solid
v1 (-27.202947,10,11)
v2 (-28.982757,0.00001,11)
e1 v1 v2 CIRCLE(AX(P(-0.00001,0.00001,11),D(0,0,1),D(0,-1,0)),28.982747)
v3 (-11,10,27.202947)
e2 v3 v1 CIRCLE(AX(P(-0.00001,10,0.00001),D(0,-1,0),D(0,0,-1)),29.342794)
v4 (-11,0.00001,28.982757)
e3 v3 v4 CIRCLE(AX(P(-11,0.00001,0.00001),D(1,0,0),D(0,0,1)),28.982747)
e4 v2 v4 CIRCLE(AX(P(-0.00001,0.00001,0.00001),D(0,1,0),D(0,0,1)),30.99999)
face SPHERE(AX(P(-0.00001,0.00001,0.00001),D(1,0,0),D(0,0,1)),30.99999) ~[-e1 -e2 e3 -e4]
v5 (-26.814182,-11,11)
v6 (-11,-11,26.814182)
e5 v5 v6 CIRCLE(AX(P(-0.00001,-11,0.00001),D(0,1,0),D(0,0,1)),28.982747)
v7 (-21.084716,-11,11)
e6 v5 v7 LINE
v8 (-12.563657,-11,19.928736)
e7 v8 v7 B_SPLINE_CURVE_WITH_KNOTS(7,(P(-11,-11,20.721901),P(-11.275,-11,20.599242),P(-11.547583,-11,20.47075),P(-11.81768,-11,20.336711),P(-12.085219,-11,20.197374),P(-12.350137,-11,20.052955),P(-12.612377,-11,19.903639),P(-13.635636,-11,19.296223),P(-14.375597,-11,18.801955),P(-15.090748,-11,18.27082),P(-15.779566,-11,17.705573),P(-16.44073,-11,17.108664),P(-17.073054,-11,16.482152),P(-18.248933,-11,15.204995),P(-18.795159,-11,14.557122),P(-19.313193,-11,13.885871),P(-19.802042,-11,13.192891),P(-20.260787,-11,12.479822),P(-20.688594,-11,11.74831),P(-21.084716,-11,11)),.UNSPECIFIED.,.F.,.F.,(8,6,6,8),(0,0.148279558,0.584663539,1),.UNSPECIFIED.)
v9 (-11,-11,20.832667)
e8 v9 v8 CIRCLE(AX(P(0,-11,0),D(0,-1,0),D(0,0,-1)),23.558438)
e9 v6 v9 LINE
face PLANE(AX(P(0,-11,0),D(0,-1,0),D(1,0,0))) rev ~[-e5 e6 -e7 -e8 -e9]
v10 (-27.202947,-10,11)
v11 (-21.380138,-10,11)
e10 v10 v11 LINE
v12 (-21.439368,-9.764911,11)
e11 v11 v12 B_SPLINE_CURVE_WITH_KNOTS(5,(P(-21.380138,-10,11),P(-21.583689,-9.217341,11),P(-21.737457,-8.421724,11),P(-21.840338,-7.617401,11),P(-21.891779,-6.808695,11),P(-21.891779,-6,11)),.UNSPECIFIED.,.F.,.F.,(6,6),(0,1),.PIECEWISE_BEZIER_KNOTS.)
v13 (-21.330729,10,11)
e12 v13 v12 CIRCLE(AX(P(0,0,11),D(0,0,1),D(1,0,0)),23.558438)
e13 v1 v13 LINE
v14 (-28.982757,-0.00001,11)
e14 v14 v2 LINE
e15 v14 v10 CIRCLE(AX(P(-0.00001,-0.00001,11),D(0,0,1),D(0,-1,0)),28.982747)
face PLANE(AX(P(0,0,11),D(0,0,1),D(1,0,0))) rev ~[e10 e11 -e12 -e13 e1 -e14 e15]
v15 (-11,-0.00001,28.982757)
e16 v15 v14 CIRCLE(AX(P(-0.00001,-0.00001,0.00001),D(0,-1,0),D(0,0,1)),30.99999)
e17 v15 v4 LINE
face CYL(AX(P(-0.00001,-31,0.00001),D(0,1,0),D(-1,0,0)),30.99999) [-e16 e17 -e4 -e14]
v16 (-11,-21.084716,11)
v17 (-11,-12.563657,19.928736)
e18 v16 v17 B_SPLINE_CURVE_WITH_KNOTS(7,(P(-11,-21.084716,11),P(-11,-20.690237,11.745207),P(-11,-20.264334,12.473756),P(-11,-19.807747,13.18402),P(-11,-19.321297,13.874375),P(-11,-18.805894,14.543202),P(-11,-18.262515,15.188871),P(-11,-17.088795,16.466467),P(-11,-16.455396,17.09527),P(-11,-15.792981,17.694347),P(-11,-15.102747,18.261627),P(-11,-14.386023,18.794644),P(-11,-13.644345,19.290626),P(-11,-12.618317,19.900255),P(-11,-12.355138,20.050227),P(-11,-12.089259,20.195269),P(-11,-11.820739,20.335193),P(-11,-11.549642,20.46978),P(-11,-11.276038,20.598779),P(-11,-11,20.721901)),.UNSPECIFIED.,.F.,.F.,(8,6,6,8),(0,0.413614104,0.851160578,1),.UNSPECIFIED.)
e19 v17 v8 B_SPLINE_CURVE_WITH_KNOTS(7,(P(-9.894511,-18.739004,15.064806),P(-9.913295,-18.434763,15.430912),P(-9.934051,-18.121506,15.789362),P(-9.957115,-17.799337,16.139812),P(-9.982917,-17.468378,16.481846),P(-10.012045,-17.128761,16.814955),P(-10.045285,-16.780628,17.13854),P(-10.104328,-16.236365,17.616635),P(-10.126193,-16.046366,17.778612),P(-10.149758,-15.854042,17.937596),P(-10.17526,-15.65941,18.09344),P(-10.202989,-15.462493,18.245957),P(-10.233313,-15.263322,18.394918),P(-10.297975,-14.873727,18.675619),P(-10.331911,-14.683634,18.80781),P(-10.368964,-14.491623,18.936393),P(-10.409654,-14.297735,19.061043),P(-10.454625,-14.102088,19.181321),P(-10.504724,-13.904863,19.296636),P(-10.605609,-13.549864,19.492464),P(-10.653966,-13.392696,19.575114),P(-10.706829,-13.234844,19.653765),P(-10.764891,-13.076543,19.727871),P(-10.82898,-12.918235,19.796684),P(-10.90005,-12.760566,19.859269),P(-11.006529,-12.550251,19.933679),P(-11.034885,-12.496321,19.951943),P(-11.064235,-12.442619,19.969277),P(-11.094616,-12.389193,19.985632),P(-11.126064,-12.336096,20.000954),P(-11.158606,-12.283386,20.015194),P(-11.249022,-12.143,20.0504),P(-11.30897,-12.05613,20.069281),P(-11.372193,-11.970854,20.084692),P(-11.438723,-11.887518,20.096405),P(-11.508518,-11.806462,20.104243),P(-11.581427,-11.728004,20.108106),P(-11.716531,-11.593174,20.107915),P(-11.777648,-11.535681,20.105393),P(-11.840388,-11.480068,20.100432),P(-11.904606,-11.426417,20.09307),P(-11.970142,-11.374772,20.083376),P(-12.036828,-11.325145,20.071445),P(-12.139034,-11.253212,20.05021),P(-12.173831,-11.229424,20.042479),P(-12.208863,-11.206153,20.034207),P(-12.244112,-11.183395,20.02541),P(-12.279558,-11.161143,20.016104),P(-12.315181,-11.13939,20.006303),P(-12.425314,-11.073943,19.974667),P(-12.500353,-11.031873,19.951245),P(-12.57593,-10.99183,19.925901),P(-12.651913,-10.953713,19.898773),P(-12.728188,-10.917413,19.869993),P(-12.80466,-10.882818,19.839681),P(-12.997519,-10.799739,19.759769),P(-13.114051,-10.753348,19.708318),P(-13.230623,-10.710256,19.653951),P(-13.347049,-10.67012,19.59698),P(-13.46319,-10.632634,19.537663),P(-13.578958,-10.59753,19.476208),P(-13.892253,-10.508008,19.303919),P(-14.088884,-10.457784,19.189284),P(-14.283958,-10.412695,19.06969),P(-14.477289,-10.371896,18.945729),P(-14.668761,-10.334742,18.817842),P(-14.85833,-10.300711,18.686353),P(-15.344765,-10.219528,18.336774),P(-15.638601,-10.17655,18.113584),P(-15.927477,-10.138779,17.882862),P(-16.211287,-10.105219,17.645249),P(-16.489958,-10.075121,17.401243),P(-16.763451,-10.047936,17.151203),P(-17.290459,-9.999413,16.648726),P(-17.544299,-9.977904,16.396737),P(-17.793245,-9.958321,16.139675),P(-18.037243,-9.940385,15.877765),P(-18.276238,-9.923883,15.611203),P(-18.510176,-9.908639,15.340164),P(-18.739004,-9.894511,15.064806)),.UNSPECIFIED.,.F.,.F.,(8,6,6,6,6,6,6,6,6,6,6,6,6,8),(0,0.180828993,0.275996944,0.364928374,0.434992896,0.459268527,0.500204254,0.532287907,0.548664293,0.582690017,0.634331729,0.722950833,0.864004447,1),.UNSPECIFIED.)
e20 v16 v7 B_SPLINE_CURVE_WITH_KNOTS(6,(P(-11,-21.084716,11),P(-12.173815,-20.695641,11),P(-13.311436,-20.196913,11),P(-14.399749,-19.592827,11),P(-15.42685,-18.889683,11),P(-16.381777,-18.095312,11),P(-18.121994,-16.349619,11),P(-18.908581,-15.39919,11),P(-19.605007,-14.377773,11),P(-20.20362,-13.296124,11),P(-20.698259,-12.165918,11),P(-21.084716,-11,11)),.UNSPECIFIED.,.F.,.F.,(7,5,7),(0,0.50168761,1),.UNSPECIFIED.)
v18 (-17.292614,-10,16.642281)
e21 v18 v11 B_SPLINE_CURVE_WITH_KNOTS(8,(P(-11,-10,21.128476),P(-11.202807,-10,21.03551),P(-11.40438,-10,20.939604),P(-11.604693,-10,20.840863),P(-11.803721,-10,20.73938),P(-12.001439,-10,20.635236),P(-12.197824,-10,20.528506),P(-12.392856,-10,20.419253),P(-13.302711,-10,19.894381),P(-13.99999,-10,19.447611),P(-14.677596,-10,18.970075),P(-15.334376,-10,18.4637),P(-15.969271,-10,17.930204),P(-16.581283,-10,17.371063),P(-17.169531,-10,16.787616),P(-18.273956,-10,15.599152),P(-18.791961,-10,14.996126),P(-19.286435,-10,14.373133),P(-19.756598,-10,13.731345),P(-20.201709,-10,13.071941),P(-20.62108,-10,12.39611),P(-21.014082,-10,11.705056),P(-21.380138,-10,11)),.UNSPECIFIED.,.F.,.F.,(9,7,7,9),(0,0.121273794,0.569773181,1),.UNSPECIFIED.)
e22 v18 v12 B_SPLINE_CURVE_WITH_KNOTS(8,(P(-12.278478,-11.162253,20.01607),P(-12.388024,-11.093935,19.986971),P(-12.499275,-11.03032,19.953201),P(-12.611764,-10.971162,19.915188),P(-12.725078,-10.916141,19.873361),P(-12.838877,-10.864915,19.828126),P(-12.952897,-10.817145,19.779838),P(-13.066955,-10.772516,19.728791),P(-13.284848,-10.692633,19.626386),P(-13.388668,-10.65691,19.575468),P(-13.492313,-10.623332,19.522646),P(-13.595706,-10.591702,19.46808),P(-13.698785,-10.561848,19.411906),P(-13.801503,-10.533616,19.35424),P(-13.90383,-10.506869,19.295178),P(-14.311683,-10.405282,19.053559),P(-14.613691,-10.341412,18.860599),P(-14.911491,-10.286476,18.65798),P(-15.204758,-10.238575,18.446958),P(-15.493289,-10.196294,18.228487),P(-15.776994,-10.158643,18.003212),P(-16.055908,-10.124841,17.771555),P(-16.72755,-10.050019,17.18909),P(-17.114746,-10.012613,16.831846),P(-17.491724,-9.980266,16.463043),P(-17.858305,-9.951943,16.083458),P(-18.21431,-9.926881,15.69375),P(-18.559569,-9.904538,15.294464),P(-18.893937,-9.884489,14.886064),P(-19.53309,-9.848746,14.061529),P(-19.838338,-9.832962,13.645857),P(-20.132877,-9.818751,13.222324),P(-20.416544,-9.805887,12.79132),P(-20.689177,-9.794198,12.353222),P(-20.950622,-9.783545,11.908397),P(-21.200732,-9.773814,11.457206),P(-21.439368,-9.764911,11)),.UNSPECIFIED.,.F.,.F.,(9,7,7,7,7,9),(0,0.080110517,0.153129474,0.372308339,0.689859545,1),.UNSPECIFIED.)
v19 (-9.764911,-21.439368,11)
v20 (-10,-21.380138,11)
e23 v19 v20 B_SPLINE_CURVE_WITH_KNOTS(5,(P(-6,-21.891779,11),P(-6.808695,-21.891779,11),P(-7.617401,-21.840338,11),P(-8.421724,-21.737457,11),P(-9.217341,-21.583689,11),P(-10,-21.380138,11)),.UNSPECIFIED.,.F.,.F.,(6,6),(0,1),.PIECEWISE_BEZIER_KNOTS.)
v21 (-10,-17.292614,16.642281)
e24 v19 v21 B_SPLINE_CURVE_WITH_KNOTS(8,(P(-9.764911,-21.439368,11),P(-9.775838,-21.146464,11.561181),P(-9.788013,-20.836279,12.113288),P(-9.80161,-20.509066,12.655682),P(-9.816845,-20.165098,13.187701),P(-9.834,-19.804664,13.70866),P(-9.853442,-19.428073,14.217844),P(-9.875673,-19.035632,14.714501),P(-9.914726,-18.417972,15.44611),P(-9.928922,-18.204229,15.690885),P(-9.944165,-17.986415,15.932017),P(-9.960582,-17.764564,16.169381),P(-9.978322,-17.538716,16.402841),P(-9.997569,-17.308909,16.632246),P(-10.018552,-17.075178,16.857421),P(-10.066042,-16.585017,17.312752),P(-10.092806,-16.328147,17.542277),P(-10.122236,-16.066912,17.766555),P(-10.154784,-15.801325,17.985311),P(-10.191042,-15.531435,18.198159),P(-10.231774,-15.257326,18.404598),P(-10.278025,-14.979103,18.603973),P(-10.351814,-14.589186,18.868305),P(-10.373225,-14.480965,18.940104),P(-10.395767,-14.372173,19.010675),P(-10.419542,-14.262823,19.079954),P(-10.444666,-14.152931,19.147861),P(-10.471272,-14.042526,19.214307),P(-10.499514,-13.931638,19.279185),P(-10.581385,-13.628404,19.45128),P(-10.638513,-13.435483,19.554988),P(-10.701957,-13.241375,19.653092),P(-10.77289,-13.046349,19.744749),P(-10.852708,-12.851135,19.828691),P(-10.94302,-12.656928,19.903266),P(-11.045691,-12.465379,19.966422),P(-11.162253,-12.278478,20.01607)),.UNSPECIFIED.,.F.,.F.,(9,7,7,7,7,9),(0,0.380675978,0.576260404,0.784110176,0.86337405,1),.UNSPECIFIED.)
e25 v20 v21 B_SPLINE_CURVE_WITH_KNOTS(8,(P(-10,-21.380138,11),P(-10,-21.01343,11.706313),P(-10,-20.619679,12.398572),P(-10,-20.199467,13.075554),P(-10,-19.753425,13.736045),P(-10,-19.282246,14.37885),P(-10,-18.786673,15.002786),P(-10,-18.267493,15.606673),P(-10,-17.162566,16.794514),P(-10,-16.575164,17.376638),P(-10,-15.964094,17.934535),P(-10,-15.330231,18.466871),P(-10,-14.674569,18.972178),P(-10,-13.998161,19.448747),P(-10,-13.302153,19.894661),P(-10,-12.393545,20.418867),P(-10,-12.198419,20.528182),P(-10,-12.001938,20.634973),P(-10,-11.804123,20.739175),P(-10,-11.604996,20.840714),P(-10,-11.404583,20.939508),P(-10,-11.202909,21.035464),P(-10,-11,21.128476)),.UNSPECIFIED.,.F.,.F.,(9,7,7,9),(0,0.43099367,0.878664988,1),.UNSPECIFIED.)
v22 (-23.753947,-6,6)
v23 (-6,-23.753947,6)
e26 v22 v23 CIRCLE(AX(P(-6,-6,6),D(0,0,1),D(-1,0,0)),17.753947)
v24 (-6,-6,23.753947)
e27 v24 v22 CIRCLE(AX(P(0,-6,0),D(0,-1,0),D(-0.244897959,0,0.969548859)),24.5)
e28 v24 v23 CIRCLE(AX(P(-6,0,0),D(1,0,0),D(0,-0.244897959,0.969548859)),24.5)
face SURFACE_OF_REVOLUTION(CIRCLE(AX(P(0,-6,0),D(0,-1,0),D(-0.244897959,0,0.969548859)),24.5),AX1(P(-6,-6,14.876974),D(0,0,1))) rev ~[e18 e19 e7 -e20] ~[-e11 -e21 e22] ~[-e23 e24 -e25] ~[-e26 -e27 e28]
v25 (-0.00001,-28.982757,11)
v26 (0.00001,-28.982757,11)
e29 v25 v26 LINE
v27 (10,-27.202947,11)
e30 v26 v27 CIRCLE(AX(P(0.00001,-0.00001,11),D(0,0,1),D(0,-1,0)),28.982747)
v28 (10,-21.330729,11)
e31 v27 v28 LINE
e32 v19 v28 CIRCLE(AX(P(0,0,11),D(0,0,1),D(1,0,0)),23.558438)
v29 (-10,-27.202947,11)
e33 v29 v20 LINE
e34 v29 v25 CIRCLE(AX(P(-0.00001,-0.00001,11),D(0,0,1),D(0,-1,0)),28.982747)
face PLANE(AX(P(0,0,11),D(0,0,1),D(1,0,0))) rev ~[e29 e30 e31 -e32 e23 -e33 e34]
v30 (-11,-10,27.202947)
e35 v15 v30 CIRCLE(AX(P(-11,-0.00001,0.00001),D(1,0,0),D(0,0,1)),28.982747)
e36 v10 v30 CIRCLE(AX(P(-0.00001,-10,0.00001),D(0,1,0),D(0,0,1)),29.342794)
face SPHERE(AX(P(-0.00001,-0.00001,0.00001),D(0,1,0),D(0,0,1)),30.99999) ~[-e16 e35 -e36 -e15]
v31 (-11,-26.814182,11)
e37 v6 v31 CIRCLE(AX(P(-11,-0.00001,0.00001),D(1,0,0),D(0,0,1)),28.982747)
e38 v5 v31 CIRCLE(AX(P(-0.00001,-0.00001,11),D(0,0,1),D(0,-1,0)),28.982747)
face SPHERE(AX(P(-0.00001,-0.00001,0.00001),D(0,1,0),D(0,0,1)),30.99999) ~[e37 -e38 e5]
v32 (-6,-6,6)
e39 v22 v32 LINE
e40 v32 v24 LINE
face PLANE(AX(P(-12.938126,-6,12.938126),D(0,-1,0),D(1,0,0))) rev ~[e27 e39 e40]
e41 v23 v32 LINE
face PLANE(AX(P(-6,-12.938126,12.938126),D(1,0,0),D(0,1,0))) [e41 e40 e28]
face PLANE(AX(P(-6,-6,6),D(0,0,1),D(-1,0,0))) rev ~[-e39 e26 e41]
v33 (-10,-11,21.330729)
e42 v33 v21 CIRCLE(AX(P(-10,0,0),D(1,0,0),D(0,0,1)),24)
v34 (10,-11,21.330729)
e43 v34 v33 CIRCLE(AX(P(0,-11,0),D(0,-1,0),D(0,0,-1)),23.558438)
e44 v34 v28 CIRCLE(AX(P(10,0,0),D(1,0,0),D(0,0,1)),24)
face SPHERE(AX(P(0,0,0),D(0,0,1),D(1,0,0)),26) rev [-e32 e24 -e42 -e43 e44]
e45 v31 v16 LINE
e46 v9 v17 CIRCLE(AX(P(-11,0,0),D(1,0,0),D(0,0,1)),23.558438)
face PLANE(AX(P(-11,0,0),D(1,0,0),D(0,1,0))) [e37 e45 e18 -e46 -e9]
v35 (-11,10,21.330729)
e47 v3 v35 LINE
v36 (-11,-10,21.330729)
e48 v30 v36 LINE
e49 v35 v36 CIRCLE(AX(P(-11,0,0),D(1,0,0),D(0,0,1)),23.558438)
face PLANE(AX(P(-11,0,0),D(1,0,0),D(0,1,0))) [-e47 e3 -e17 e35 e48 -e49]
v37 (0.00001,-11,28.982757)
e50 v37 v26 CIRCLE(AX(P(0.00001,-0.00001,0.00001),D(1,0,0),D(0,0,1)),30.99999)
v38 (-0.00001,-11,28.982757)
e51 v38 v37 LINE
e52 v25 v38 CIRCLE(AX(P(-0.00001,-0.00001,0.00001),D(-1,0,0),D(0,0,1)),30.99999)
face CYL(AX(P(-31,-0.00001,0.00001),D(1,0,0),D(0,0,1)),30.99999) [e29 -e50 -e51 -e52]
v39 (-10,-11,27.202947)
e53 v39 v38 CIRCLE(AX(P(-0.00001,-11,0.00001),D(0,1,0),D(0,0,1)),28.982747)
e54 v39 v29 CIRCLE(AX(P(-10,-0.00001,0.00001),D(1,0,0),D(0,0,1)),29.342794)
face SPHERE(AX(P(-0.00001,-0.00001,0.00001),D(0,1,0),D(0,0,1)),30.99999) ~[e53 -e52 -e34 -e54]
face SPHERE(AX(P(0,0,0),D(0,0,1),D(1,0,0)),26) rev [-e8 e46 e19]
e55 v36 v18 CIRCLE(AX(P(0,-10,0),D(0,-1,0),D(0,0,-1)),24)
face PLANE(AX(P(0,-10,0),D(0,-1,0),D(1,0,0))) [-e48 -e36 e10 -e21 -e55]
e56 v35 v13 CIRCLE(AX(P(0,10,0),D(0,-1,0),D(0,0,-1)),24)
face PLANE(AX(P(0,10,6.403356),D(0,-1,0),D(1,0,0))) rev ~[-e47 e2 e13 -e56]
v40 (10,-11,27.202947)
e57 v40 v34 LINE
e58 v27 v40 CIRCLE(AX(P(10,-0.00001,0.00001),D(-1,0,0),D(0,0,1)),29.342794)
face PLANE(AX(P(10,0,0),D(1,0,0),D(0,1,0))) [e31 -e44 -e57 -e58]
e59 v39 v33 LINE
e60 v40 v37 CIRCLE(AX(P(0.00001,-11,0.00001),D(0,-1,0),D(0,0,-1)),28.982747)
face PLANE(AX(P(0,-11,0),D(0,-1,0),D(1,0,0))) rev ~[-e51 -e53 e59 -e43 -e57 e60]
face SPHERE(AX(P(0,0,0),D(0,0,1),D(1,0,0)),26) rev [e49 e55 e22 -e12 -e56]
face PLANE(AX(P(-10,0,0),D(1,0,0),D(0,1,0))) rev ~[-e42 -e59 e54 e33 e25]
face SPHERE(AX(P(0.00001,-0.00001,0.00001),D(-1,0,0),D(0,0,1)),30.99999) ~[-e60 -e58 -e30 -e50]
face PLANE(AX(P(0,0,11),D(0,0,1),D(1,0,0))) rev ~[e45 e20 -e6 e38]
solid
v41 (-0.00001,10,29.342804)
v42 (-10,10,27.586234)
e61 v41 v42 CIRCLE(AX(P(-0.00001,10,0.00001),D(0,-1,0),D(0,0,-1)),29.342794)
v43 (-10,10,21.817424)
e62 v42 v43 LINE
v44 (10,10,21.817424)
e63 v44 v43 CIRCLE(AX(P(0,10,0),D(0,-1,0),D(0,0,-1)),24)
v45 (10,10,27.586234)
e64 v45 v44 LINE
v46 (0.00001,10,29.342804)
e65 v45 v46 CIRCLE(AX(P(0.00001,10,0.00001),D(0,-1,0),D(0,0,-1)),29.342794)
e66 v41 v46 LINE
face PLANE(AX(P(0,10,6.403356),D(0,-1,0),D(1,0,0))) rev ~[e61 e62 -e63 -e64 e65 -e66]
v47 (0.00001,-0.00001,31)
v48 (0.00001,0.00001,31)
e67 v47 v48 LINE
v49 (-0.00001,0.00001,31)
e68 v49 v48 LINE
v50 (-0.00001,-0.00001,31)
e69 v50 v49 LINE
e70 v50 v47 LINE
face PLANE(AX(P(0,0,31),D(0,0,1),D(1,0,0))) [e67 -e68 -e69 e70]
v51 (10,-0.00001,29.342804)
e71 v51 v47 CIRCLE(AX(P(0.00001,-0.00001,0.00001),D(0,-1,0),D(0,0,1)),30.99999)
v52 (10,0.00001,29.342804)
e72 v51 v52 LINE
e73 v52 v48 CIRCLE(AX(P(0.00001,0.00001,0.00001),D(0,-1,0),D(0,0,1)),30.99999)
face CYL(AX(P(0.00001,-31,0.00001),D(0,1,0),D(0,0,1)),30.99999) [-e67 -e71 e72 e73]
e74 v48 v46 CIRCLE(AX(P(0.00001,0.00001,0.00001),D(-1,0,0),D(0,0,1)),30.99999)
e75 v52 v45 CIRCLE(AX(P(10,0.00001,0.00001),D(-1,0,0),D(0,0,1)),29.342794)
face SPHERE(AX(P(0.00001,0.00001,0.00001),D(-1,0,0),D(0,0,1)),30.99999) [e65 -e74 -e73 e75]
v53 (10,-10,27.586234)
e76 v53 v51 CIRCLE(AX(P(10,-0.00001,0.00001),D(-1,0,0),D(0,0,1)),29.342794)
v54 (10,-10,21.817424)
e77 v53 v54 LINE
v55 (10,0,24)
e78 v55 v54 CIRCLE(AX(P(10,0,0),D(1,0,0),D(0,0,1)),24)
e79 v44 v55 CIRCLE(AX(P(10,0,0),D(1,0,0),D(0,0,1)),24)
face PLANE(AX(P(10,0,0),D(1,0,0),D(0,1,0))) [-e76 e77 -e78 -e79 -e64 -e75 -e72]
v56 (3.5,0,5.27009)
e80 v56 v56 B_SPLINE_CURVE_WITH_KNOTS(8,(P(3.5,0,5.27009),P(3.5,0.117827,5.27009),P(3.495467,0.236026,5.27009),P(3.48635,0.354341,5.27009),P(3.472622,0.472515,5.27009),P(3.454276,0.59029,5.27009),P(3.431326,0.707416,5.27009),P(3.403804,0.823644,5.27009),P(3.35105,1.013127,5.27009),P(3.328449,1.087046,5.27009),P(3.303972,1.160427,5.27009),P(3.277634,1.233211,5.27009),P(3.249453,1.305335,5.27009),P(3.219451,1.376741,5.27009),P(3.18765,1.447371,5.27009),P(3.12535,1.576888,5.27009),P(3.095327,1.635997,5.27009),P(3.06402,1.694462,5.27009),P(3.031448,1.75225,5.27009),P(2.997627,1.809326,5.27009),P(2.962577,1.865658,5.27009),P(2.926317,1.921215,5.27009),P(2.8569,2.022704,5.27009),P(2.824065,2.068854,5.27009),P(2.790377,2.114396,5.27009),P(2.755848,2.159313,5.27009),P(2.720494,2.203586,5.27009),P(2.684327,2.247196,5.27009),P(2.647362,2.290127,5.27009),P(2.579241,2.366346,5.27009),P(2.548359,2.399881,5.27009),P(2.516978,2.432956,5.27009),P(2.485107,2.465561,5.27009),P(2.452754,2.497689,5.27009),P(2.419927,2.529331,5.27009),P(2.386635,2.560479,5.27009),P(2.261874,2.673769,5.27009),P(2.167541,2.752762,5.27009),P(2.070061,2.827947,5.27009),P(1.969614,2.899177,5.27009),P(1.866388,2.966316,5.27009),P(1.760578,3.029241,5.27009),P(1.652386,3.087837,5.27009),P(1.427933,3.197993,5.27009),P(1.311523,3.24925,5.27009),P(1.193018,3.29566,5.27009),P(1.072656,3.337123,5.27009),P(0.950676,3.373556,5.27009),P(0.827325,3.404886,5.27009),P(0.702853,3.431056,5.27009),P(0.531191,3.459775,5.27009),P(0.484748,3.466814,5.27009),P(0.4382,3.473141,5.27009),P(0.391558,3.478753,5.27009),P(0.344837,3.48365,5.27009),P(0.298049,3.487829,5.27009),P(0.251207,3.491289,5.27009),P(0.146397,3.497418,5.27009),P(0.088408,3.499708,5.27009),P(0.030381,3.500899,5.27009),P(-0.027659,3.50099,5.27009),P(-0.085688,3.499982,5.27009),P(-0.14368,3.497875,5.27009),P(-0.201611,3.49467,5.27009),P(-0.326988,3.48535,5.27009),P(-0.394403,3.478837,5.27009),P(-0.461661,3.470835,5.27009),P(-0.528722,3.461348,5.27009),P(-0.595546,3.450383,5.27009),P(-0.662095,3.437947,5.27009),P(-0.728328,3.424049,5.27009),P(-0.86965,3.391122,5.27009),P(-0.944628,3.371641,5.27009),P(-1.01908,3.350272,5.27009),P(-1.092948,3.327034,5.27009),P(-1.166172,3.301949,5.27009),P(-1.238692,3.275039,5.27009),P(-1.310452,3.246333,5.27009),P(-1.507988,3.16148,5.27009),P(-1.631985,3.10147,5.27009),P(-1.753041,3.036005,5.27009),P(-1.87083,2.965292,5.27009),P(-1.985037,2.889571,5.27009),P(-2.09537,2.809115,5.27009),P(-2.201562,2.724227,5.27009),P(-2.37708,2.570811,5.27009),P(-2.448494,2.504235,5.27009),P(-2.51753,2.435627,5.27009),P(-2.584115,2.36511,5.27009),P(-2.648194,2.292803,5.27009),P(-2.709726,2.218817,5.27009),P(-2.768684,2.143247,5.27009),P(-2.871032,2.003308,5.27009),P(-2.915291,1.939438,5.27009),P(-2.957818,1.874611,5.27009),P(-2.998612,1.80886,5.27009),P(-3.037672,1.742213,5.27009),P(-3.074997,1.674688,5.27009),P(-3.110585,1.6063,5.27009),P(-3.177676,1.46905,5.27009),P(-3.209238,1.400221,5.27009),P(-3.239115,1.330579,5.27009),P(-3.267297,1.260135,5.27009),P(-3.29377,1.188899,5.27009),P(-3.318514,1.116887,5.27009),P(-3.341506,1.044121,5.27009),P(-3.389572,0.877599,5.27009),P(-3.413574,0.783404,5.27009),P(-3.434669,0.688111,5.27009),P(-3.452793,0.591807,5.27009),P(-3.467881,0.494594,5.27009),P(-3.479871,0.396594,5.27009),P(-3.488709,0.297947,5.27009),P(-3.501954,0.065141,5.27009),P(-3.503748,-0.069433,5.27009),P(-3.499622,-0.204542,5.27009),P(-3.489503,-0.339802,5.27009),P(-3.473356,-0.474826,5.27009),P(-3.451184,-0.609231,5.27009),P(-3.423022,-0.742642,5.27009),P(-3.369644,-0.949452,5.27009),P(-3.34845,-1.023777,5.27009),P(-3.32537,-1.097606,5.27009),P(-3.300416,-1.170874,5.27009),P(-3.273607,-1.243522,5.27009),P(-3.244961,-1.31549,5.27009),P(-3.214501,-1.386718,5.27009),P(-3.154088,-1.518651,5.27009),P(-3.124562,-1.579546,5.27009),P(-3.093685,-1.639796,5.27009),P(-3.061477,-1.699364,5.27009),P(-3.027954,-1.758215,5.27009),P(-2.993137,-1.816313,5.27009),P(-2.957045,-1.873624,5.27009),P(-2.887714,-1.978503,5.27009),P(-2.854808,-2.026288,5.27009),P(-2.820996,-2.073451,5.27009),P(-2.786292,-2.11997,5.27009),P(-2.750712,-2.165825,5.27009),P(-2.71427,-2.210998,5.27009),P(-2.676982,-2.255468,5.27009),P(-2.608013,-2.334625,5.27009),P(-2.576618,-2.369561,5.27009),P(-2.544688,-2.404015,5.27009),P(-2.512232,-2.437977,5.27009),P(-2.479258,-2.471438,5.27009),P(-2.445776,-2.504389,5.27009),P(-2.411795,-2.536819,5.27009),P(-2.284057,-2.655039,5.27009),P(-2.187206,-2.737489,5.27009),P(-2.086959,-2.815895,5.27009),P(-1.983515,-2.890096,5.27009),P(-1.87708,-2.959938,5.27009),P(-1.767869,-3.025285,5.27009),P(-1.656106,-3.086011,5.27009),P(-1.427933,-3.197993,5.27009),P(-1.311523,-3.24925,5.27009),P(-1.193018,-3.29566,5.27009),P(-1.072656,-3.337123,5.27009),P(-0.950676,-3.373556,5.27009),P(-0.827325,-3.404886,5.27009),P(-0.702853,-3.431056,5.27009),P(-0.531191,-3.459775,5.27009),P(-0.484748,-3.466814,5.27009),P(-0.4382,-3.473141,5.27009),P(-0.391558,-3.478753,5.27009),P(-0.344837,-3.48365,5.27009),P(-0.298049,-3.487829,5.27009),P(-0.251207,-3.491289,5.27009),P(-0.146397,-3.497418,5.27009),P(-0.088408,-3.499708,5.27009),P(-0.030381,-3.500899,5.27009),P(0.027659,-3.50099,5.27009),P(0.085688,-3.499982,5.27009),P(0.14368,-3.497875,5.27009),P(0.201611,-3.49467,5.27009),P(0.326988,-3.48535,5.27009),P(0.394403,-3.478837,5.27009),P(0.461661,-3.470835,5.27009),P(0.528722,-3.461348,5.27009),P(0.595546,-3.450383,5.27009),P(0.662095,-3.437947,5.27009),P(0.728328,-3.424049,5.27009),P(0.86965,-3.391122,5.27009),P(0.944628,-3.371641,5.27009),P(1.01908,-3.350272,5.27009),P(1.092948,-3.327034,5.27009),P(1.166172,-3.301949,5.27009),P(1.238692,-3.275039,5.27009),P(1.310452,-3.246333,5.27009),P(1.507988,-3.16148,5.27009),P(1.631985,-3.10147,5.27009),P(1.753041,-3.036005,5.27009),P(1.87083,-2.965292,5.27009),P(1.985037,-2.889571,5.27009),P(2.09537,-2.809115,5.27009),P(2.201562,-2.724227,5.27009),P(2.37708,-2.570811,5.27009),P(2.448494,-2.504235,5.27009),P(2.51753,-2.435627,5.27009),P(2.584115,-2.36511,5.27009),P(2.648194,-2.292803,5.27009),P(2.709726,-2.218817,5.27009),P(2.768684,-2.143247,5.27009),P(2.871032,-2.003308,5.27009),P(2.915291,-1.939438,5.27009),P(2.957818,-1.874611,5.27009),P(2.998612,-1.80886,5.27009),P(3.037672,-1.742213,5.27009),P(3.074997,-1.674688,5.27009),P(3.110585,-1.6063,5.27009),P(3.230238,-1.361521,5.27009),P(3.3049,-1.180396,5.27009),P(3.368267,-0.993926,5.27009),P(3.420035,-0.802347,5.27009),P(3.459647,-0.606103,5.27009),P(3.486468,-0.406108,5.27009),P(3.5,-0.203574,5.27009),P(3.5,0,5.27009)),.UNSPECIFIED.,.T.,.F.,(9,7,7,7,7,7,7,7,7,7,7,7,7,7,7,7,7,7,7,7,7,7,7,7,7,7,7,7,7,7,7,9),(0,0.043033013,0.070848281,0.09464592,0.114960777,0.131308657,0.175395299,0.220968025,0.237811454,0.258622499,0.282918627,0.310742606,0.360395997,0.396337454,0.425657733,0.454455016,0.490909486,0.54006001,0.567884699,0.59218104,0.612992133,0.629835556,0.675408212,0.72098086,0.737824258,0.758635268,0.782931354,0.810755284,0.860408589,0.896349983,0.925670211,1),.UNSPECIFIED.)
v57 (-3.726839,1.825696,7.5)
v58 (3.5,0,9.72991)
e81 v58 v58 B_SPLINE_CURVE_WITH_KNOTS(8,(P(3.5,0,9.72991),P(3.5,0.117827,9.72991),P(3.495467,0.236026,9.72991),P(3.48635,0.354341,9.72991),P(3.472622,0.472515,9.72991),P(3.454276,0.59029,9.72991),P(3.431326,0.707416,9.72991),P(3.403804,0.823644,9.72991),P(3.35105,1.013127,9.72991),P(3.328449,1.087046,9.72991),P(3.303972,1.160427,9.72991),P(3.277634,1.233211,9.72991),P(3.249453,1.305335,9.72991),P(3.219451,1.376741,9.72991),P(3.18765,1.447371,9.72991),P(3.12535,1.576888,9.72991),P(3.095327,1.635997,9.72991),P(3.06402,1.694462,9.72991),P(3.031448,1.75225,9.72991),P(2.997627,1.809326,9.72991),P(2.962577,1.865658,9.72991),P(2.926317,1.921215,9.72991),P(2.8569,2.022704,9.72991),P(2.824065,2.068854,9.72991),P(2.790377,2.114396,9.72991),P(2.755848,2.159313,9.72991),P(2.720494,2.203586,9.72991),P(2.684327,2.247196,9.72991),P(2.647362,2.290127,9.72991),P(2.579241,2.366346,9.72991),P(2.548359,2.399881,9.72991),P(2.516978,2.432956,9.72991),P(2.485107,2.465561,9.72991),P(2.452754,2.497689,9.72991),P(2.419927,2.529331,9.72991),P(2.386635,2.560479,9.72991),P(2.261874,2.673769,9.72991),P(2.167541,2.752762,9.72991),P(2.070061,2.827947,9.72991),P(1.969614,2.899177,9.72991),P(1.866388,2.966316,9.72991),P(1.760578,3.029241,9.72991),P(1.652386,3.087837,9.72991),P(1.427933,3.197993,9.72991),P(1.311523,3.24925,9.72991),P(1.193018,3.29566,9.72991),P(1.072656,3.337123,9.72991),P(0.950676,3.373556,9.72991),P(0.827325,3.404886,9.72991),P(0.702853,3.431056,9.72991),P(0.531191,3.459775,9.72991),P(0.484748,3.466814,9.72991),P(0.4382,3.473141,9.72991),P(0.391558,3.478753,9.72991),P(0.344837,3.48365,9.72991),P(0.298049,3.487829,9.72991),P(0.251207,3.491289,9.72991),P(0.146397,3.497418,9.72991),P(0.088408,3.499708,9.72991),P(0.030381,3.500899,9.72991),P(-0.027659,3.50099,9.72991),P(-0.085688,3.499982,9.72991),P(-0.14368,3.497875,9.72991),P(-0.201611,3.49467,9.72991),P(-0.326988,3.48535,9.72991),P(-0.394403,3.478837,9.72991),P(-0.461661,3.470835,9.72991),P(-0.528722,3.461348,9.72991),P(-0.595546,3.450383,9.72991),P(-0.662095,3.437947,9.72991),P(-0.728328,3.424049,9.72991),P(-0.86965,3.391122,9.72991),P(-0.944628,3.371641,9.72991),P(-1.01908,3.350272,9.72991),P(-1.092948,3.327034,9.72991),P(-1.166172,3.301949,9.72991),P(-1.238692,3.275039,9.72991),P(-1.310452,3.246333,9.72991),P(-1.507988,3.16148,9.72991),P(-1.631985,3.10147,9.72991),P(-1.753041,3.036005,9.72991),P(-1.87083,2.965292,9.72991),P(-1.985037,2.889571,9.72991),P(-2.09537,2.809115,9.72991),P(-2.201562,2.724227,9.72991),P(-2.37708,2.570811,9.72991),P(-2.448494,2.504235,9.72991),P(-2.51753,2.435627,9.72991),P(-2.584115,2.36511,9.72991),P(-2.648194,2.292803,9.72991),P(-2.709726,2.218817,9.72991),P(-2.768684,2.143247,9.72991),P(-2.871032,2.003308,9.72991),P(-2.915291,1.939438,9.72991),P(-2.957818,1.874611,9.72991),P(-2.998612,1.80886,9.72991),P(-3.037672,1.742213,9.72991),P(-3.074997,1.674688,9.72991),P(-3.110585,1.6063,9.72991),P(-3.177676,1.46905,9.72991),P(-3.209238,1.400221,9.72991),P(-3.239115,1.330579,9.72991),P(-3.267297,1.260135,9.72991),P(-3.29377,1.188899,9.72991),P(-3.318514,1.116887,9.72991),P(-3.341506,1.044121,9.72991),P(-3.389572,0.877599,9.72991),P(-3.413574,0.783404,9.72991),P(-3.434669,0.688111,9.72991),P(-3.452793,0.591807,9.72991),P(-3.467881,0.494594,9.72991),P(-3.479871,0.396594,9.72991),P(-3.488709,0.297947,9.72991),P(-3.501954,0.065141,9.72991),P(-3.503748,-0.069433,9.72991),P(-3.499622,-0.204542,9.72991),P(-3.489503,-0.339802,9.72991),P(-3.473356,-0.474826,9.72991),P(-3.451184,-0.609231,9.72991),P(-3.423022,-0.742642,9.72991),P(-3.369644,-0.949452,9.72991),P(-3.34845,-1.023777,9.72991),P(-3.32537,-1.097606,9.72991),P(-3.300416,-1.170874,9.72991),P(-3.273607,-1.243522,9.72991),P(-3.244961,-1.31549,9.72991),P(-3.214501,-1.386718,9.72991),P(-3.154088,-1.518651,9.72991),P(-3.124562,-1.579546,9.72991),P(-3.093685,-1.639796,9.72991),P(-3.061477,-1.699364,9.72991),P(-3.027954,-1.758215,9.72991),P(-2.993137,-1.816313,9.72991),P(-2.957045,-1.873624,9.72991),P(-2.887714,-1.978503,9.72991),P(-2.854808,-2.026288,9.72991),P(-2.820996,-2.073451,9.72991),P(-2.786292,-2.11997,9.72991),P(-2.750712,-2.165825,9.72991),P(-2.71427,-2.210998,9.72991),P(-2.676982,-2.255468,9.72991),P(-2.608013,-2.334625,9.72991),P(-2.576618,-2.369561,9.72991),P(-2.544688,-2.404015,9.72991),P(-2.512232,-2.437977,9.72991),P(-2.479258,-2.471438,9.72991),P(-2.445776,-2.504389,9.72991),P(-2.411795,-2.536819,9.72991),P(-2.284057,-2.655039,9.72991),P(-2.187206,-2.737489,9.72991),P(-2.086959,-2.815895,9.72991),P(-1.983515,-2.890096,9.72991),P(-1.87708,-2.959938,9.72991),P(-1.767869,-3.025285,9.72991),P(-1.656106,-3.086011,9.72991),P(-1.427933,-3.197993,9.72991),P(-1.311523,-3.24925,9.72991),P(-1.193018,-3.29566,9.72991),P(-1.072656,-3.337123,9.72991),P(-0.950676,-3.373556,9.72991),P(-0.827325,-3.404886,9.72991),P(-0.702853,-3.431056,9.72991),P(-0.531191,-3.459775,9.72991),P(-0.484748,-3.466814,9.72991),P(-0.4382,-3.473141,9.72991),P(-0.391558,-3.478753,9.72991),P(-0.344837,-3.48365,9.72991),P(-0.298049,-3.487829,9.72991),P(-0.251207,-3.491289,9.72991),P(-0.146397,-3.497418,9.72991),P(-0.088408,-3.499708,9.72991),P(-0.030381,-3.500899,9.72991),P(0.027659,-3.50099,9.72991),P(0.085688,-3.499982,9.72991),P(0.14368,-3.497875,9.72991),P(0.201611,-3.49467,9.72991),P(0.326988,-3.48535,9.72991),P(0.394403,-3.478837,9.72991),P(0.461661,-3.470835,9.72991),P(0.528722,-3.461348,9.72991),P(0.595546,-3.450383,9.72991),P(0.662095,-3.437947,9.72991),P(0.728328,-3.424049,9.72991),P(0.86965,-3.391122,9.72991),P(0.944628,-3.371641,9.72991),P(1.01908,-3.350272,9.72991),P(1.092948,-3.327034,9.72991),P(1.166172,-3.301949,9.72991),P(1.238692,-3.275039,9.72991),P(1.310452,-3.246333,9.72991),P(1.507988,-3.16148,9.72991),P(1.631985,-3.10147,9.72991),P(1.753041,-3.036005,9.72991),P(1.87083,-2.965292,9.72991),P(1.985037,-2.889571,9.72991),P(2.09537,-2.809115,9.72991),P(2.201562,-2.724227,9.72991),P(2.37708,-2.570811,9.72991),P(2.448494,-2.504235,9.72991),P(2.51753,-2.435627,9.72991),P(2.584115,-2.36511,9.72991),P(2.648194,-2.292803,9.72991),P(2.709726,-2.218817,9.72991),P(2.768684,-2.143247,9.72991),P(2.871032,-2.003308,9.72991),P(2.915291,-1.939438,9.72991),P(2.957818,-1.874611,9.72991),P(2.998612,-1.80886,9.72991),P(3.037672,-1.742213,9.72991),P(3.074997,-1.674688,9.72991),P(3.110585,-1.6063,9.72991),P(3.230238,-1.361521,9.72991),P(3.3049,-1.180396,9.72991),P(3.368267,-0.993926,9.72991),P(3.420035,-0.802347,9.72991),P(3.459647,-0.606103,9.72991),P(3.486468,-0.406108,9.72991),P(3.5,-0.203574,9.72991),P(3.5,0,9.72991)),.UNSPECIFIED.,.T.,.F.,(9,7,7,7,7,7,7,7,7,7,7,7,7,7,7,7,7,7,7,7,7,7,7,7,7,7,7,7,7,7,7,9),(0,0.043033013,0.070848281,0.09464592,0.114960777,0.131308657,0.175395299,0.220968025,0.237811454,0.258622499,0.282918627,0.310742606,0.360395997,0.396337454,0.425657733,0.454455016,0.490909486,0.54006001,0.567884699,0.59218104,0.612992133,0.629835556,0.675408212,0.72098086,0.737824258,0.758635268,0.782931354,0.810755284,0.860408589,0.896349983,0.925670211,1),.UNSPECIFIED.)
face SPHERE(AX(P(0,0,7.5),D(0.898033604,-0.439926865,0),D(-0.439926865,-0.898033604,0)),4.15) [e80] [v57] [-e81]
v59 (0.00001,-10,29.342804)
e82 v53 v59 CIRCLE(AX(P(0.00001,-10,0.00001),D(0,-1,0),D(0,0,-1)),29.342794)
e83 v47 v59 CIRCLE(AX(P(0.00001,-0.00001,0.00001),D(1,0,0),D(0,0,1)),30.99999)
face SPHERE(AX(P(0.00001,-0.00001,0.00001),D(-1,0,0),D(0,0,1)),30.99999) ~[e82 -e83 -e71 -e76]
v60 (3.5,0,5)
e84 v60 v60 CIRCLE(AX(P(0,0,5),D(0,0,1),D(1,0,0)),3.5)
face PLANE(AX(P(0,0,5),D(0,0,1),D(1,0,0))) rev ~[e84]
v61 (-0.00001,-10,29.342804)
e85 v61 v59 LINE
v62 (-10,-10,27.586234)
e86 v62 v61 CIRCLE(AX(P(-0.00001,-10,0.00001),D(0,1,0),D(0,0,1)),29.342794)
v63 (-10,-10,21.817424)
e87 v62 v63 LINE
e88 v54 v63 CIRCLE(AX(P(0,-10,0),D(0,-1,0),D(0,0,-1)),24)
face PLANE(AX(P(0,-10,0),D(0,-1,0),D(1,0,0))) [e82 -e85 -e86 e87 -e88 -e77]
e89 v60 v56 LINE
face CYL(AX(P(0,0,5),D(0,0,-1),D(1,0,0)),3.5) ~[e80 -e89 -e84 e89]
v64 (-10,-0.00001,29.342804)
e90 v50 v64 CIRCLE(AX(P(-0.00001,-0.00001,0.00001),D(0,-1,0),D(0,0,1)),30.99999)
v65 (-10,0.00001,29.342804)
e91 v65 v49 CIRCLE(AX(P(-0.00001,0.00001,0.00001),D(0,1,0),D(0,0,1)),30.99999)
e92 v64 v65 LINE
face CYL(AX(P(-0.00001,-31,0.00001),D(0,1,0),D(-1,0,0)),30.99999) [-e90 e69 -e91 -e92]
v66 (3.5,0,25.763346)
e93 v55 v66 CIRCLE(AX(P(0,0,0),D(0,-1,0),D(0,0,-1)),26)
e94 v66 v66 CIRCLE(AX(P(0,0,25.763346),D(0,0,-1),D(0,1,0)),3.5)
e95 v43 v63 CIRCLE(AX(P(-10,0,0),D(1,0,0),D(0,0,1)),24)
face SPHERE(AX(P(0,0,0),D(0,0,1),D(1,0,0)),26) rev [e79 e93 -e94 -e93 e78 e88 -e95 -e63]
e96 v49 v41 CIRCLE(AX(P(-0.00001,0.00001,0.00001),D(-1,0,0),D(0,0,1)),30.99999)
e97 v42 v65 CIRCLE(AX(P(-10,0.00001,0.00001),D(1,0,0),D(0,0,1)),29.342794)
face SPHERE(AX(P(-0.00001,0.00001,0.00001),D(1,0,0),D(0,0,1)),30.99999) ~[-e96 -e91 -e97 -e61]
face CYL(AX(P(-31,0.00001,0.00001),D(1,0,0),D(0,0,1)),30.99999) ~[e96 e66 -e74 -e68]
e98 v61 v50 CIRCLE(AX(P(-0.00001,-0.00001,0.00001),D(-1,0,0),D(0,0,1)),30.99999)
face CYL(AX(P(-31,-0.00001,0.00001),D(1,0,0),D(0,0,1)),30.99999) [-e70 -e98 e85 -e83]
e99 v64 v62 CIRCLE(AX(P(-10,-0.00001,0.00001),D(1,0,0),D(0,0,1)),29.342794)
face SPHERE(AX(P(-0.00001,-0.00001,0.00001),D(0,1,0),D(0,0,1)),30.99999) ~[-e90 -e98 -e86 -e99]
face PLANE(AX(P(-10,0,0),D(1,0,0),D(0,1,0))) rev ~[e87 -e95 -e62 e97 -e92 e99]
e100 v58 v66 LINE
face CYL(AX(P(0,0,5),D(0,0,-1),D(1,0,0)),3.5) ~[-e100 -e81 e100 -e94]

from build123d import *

# Parameters (mm, degrees)
F0_W          = 62
F0_H          = 62
F1_DEPTH      = 31
F2_R          = 30.99999
F3_DEPTH      = 31
F3_DEPTH_BACK = 11
F7_W          = 63
F7_H          = 63
F8_DEPTH      = 18.9837565917
F10_W         = 63
F10_H         = 63
F11_DEPTH     = 1
F13_W         = 63
F13_H         = 63
F14_DEPTH     = 1
F16_W         = 63
F16_H         = 63
F17_DEPTH     = 25
F20_R         = 3.5
F22_DEPTH     = 22
F24_DEPTH     = 25
F28_ANGLE     = 90
F29_ANGLE     = 90


# Not quite as in the source:
# - a fillet or chamfer is up to 0.001 mm smaller than in the source, because OpenCascade refuses the exact size


with BuildPart() as f1:
    # F0 (on Top) → F1 (new body, symmetric)
    with BuildSketch(Plane.XY):
        Rectangle(F0_W, F0_H)
    extrude(amount=F1_DEPTH, both=True)

    # F2 (radius 31 in the source; OpenCascade refuses exactly that, so slightly less here)
    f2_edges = [f1.edges().sort_by_distance(p)[0] for p in [
        (0, 31, 31),
        (-31, 0, 31),
        (0, -31, 31),
        (31, 0, 31),
        (0, 31, -31),
        (-31, 0, -31),
        (0, -31, -31),
        (31, 0, -31),
        (-31, 31, 0),
        (-31, -31, 0),
        (31, -31, 0),
        (31, 31, 0),
    ]]
    fillet(f2_edges, radius=F2_R)

    # F0 (on Top) → F3 (cut, two sides)
    with BuildSketch(Plane.XY) as f3_sk:
        Rectangle(F0_W, F0_H)
    extrude(amount=-F3_DEPTH, mode=Mode.SUBTRACT)
    extrude(f3_sk.sketch, amount=F3_DEPTH_BACK, mode=Mode.SUBTRACT)

    # F4 (on Front) → F5 (revolve, cut)
    with BuildSketch(Plane.XZ):
        with BuildLine():
            Line((0, 26), (0, -26))
            ThreePointArc((0, -26), (26, 0), (0, 26))
        make_face()
    revolve(axis=Axis((0, 0, 0), (0, 0, -1)), mode=Mode.SUBTRACT)

    # F7 (on offset) → F8 (cut, through all)
    with BuildSketch(Plane.YZ.offset(10)):
        Rectangle(F7_W, F7_H)
    extrude(amount=F8_DEPTH, mode=Mode.SUBTRACT)

    # F10 (on offset) → F11 (cut)
    with BuildSketch(Plane.YZ.offset(-10)):
        Rectangle(F10_W, F10_H)
    extrude(amount=-F11_DEPTH, mode=Mode.SUBTRACT)

    # F13 (on offset) → F14 (cut)
    with BuildSketch(Plane.XZ.offset(10)):
        Rectangle(F13_W, F13_H)
    extrude(amount=F14_DEPTH, mode=Mode.SUBTRACT)

    # F16 (on offset) → F17 (cut)
    with BuildSketch(Plane.XZ.offset(-10)):
        with Locations((0, 6.4033556429)):
            Rectangle(F16_W, F16_H)
    extrude(amount=-F17_DEPTH, mode=Mode.SUBTRACT)

    # F20 (on offset) → F22 (join)
    with BuildSketch(Plane.XY.offset(5)):
        Circle(F20_R)
    extrude(amount=F22_DEPTH)

    # F21 (on offset) → F23 (revolve)
    with BuildSketch(Plane.XY.offset(7.5)):
        with BuildLine():
            Line((3.7268394552, -1.8256964905), (-3.7268394552, 1.8256964905))
            ThreePointArc((-3.7268394552, 1.8256964905), (-1.8256964905, -3.7268394552), (3.7268394552, -1.8256964905))
        make_face()
    revolve(axis=Axis((0, 0, 7.5), (0.8980336037, -0.4399268652, 0)))

    # F20 (on offset) → F24 (cut)
    with BuildSketch(Plane.XY.offset(5)):
        Circle(F20_R)
    extrude(amount=-F24_DEPTH, mode=Mode.SUBTRACT)



with BuildPart() as f28:
    # F26 (on offset) → F28 (revolve)
    with BuildSketch(Plane.XZ.offset(6)):
        with BuildLine():
            Line((-11, 11), (-11, 21.3307290077))
            ThreePointArc((-11, 21.3307290077), (-16.9705627485, 16.9705627485), (-21.3307290077, 11))
            Line((-21.3307290077, 11), (-11, 11))
        make_face()
    revolve(axis=Axis((-11, -6, 0), (0, 0, 1)), revolution_arc=F28_ANGLE)


with BuildPart() as f1_1:
    add(f1.part)

    add(f28.part)  # F29 merges F28
    # F27 (on offset) → F29 (revolve)
    with BuildSketch(Plane.XZ.offset(6)):
        with BuildLine():
            Line((-6, 6), (-6, 23.7539470404))
            ThreePointArc((-6, 23.7539470404), (-17.3241161391, 17.3241161391), (-23.7539470404, 6))
            Line((-23.7539470404, 6), (-6, 6))
        make_face()
    revolve(axis=Axis((-6, -6, 14.8769735202), (0, 0, 1)), revolution_arc=F29_ANGLE)


solid = f1_1.part
